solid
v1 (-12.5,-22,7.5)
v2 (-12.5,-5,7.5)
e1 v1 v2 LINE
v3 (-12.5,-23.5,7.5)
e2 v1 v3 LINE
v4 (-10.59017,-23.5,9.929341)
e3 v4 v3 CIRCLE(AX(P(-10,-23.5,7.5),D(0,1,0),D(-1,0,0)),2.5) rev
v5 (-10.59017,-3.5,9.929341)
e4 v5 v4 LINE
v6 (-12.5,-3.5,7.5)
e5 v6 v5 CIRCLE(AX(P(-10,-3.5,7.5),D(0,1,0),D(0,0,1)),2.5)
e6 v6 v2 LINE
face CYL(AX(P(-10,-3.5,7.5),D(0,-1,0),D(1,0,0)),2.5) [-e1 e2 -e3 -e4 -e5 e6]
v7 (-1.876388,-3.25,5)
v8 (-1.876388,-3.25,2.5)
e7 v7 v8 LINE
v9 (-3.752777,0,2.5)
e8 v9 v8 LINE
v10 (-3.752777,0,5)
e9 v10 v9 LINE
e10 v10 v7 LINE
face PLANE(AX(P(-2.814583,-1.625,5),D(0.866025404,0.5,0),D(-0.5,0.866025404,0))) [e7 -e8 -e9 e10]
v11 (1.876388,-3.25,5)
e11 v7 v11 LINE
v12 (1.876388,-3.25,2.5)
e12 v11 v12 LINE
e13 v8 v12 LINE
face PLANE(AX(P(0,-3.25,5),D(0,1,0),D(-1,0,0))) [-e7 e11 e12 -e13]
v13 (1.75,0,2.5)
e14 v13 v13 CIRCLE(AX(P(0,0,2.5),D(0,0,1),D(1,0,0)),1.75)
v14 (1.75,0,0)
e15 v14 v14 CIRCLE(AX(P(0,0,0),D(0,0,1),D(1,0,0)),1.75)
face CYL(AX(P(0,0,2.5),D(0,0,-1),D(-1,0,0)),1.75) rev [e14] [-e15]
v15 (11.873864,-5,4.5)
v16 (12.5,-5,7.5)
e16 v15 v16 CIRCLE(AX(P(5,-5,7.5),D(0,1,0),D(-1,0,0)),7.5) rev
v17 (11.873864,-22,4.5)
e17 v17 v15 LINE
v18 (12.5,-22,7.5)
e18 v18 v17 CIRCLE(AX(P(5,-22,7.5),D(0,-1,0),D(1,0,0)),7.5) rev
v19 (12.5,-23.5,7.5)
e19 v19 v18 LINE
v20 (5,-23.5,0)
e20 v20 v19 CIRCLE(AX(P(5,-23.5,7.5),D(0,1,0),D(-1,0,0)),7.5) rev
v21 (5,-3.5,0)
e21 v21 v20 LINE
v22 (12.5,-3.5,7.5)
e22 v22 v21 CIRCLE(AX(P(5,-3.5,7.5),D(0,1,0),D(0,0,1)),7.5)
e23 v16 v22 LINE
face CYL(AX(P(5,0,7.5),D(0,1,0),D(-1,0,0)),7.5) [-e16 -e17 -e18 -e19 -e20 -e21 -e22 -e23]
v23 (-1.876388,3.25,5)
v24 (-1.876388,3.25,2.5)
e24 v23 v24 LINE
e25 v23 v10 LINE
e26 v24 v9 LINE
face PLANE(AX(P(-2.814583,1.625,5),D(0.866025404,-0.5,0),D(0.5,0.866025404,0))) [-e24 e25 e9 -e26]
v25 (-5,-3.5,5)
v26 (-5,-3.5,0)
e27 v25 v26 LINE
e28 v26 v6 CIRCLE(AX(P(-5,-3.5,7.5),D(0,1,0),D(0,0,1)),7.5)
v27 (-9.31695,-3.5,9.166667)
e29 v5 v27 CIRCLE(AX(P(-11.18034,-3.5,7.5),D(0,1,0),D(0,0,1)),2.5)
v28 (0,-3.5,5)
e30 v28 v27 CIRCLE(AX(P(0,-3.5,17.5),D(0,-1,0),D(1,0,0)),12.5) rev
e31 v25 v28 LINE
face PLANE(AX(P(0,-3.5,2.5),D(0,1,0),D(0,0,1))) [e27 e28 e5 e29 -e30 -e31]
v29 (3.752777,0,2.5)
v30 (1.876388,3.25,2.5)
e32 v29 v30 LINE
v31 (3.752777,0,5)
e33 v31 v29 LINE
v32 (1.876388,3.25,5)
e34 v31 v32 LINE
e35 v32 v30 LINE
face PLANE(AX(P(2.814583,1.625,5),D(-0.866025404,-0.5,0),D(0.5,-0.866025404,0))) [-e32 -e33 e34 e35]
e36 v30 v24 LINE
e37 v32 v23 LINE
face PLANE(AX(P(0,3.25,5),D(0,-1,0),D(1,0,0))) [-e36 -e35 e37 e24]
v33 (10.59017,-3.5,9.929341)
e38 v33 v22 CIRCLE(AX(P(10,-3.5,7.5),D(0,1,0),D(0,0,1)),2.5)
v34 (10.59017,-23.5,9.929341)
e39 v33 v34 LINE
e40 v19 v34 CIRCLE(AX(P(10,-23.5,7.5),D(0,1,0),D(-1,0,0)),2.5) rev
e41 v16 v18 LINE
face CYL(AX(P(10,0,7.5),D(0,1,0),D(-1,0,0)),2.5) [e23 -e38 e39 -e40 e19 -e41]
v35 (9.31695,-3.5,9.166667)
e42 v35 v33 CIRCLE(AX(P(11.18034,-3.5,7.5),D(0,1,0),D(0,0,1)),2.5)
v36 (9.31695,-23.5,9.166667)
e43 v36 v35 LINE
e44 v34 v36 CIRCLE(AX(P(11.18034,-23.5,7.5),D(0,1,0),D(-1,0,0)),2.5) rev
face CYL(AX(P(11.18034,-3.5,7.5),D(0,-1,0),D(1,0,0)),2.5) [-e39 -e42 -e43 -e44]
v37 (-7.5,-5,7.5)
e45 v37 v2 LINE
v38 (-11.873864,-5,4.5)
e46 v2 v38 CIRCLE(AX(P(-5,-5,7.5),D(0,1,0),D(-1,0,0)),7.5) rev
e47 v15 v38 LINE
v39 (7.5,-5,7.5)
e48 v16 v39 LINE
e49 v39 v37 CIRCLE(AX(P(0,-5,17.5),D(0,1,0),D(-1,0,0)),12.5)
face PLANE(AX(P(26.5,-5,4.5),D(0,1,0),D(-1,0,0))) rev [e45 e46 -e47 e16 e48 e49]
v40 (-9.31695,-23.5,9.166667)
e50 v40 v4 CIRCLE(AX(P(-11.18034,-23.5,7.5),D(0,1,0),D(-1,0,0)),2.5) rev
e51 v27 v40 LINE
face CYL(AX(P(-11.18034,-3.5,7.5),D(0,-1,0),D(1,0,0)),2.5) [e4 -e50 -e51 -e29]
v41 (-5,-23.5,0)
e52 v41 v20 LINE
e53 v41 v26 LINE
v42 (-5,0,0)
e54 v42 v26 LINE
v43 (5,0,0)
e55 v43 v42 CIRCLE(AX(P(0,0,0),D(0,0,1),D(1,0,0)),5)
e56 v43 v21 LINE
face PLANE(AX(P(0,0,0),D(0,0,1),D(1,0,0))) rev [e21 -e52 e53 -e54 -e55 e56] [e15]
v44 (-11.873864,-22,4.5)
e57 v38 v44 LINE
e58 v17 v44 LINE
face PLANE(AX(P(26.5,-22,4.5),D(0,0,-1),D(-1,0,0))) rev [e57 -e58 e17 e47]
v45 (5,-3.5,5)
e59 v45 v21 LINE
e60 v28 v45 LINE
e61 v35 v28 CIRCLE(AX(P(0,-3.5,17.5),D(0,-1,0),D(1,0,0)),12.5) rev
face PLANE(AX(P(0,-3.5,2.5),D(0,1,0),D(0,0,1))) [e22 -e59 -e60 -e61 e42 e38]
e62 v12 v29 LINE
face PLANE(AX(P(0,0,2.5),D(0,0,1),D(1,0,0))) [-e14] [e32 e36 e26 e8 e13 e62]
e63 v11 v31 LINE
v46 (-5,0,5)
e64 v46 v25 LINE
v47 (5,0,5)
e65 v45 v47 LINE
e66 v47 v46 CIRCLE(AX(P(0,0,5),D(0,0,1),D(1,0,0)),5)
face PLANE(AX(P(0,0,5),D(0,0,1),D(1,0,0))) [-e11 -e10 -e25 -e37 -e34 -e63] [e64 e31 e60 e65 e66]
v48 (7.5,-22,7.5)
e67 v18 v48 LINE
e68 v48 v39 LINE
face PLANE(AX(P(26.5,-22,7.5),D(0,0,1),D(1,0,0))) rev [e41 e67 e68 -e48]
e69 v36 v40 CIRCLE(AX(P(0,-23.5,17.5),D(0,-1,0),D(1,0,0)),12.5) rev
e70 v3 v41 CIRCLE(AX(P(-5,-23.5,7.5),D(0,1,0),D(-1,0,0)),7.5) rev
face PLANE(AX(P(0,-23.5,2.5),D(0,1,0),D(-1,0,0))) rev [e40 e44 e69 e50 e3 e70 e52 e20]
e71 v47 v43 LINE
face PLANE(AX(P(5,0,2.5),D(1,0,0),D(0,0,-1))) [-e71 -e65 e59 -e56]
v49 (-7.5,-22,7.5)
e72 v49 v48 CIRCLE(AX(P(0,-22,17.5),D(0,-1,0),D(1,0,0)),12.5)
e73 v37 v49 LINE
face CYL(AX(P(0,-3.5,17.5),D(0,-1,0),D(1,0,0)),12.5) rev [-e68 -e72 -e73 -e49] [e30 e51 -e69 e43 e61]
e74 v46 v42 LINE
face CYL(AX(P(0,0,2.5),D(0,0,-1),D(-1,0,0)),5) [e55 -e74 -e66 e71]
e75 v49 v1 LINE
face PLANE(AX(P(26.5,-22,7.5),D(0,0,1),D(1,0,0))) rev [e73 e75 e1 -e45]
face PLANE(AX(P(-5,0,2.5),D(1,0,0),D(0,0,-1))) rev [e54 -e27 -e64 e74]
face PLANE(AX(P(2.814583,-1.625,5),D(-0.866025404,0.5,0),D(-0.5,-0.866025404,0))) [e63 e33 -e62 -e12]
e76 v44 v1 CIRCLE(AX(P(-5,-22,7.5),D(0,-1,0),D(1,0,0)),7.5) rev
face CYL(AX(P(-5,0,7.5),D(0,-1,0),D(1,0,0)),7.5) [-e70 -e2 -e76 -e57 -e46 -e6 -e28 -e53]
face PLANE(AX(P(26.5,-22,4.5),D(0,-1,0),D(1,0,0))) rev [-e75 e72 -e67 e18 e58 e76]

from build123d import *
from build123d.topology import SkipClean

# Parameters (mm, degrees)
ESBO_O1_R                = 1.75
ESBO_O1_W                = 25
ESBO_O1_H                = 20
RESSALTO_EXTRUS_O1_DEPTH = 2.5
RESSALTO_EXTRUS_O2_DEPTH = 20
ESBO_O4_W                = 3
ESBO_O4_H                = 17
CORTE_EXTRUS_O1_DEPTH    = 39
FILETE1_R                = 7.5
FILETE2_R                = 2.5
RESSALTO_EXTRUS_O3_DEPTH = 2.5


with BuildPart() as part:
    # Esboço1 → Ressalto-extrusão1 (new body)
    # profile 1 of 2: a face of its own
    with BuildSketch(Plane.XY):
        with BuildLine():
            Line((5, 0), (5, -3.5))
            Line((5, -3.5), (-5, -3.5))
            Line((-5, -3.5), (-5, 0))
            ThreePointArc((-5, 0), (0, 5), (5, 0))
        make_face()
        Circle(ESBO_O1_R, mode=Mode.SUBTRACT)
    # profile 2 of 2: a face of its own
    with BuildSketch(Plane.XY):
        with Locations((0, -13.5)):
            Rectangle(ESBO_O1_W, ESBO_O1_H)
    extrude(amount=RESSALTO_EXTRUS_O1_DEPTH)

    # Esboço3 → Ressalto-extrusão2 (add)
    with BuildSketch(Plane.XZ.offset(23.5)):
        with BuildLine():
            Line((12.5, 10), (10, 10))
            ThreePointArc((10, 10), (0, 5), (-10, 10))
            Line((-10, 10), (-12.5, 10))
            Line((-12.5, 10), (-12.5, 2.5))
            Line((-12.5, 2.5), (12.5, 2.5))
            Line((12.5, 2.5), (12.5, 10))
        make_face()
    extrude(amount=-RESSALTO_EXTRUS_O2_DEPTH)

    # Esboço4 → Corte-extrusão1 (cut)
    with BuildSketch(Plane.ZY.offset(12.5)):
        with Locations((6, -13.5)):
            Rectangle(ESBO_O4_W, ESBO_O4_H)
    extrude(amount=-CORTE_EXTRUS_O1_DEPTH, mode=Mode.SUBTRACT)

    # Filete1
    # the kernel refuses this fillet: 7.5 mm, written as the material it takes off along each edge
    with BuildSketch(Plane(origin=(-12.5, -42.25, 0), x_dir=(1, 0, 0), z_dir=(0, 1, 0)), Plane(origin=(12.5, 15.25, 0), x_dir=(-1, 0, 0), z_dir=(0, -1, 0))) as filete1_piece_1:
        with BuildLine():
            CenterArc((FILETE1_R, -FILETE1_R), FILETE1_R, 90, 90)
            Line((0, -FILETE1_R), (0, 0))
            Line((0, 0), (FILETE1_R, 0))
        make_face()
    extrude(amount=57.5, mode=Mode.SUBTRACT)

    # Filete2
    # the kernel refuses this fillet: 2.5 mm, written as the material it takes off along each edge
    with BuildSketch(Plane(origin=(10, -26.450849719, 10), x_dir=(1, 0, 0), z_dir=(0, 1, 0))) as filete2_piece_1:
        with BuildLine():
            CenterArc((1.180339887, 2.5), FILETE2_R, 221.810314896, 48.189685104)
            ThreePointArc((-0.683050094, 0.833333333), (-0.332541723, 0.424029939), (0, 0))
            Line((0, 0), (1.180339887, 0))
        make_face()
    extrude(amount=25.901699437, mode=Mode.SUBTRACT)
    with BuildSketch(Plane(origin=(-10, -26.450849719, 10), x_dir=(0.6339223950926707, 0, -0.7733966621339738), z_dir=(0, 1, 0))) as filete2_piece_2:
        with BuildLine():
            CenterArc((1.185247767, 2.497676917), FILETE2_R, 219.340106271, 48.189685104)
            Line((-0.748243889, 0.912870929), (0, 0))
            ThreePointArc((0, 0), (0.538748985, 0.011615415), (1.07749797, 0))
        make_face()
    extrude(amount=25.901699437, mode=Mode.SUBTRACT)
    with BuildSketch(Plane(origin=(12.5, -29.75, 10), x_dir=(0, 0, -1), z_dir=(0, 1, 0)), Plane(origin=(-12.5, -29.75, 10), x_dir=(1, 0, 0), z_dir=(0, 1, 0))) as filete2_piece_3:
        with BuildLine():
            CenterArc((FILETE2_R, FILETE2_R), FILETE2_R, 180, 90)
            Line((0, FILETE2_R), (0, 0))
            Line((0, 0), (FILETE2_R, 0))
        make_face()
    extrude(amount=32.5, mode=Mode.SUBTRACT)

    # Esboço5 → Ressalto-extrusão3 (add)
    # profile 1 of 6: a face of its own
    with SkipClean():  # the faces are left unmerged after this step: merging them gives an invalid solid
        with BuildSketch(Plane.XY.offset(2.5)):
            with BuildLine():
                ThreePointArc((-3.570714214, -3.5), (-4.628907596, -1.890294809), (-5, 0))
                Line((-5, 0), (-5, -3.5))
                Line((-5, -3.5), (-3.570714214, -3.5))
            make_face()
        # profile 2 of 6: a face of its own
        with BuildSketch(Plane.XY.offset(2.5)):
            with BuildLine():
                Line((5, -3.5), (5, 0))
                ThreePointArc((5, 0), (4.628907596, -1.890294809), (3.570714214, -3.5))
                Line((3.570714214, -3.5), (5, -3.5))
            make_face()
        # profile 3 of 6: a face of its own
        with BuildSketch(Plane.XY.offset(2.5)):
            with BuildLine():
                Line((5, -5), (5, -3.5))
                Line((5, -3.5), (3.570714214, -3.5))
                ThreePointArc((3.570714214, -3.5), (1.936491652, -4.609772238), (-4.7e-08, -5))
                Line((-4.7e-08, -5), (5, -5))
            make_face()
        # profile 4 of 6: a face of its own
        with BuildSketch(Plane.XY.offset(2.5)):
            with BuildLine():
                Line((-3.570714214, -3.5), (-5, -3.5))
                Line((-5, -3.5), (-5, -5))
                Line((-5, -5), (-4.7e-08, -5))
                ThreePointArc((-4.7e-08, -5), (-1.936491695, -4.60977222), (-3.570714214, -3.5))
            make_face()
        # profile 5 of 6: a face of its own
        with BuildSketch(Plane.XY.offset(2.5)):
            with BuildLine():
                Line((3.570714214, -3.5), (-3.570714214, -3.5))
                ThreePointArc((-3.570714214, -3.5), (-1.936491695, -4.60977222), (-4.7e-08, -5))
                ThreePointArc((-4.7e-08, -5), (1.936491652, -4.609772238), (3.570714214, -3.5))
            make_face()
        # profile 6 of 6: a face of its own
        with BuildSketch(Plane.XY.offset(2.5)):
            with BuildLine():
                ThreePointArc((5, 0), (0, 5), (-5, 0))
                ThreePointArc((-5, 0), (-4.628907596, -1.890294809), (-3.570714214, -3.5))
                Line((-3.570714214, -3.5), (3.570714214, -3.5))
                ThreePointArc((3.570714214, -3.5), (4.628907596, -1.890294809), (5, 0))
            make_face()
            Polygon((1.876388375, 3.25), (3.75277675, 0), (1.876388375, -3.25), (-1.876388375, -3.25), (-3.75277675, 0), (-1.876388375, 3.25), align=None, mode=Mode.SUBTRACT)
        extrude(amount=RESSALTO_EXTRUS_O3_DEPTH)


solid = part.part
